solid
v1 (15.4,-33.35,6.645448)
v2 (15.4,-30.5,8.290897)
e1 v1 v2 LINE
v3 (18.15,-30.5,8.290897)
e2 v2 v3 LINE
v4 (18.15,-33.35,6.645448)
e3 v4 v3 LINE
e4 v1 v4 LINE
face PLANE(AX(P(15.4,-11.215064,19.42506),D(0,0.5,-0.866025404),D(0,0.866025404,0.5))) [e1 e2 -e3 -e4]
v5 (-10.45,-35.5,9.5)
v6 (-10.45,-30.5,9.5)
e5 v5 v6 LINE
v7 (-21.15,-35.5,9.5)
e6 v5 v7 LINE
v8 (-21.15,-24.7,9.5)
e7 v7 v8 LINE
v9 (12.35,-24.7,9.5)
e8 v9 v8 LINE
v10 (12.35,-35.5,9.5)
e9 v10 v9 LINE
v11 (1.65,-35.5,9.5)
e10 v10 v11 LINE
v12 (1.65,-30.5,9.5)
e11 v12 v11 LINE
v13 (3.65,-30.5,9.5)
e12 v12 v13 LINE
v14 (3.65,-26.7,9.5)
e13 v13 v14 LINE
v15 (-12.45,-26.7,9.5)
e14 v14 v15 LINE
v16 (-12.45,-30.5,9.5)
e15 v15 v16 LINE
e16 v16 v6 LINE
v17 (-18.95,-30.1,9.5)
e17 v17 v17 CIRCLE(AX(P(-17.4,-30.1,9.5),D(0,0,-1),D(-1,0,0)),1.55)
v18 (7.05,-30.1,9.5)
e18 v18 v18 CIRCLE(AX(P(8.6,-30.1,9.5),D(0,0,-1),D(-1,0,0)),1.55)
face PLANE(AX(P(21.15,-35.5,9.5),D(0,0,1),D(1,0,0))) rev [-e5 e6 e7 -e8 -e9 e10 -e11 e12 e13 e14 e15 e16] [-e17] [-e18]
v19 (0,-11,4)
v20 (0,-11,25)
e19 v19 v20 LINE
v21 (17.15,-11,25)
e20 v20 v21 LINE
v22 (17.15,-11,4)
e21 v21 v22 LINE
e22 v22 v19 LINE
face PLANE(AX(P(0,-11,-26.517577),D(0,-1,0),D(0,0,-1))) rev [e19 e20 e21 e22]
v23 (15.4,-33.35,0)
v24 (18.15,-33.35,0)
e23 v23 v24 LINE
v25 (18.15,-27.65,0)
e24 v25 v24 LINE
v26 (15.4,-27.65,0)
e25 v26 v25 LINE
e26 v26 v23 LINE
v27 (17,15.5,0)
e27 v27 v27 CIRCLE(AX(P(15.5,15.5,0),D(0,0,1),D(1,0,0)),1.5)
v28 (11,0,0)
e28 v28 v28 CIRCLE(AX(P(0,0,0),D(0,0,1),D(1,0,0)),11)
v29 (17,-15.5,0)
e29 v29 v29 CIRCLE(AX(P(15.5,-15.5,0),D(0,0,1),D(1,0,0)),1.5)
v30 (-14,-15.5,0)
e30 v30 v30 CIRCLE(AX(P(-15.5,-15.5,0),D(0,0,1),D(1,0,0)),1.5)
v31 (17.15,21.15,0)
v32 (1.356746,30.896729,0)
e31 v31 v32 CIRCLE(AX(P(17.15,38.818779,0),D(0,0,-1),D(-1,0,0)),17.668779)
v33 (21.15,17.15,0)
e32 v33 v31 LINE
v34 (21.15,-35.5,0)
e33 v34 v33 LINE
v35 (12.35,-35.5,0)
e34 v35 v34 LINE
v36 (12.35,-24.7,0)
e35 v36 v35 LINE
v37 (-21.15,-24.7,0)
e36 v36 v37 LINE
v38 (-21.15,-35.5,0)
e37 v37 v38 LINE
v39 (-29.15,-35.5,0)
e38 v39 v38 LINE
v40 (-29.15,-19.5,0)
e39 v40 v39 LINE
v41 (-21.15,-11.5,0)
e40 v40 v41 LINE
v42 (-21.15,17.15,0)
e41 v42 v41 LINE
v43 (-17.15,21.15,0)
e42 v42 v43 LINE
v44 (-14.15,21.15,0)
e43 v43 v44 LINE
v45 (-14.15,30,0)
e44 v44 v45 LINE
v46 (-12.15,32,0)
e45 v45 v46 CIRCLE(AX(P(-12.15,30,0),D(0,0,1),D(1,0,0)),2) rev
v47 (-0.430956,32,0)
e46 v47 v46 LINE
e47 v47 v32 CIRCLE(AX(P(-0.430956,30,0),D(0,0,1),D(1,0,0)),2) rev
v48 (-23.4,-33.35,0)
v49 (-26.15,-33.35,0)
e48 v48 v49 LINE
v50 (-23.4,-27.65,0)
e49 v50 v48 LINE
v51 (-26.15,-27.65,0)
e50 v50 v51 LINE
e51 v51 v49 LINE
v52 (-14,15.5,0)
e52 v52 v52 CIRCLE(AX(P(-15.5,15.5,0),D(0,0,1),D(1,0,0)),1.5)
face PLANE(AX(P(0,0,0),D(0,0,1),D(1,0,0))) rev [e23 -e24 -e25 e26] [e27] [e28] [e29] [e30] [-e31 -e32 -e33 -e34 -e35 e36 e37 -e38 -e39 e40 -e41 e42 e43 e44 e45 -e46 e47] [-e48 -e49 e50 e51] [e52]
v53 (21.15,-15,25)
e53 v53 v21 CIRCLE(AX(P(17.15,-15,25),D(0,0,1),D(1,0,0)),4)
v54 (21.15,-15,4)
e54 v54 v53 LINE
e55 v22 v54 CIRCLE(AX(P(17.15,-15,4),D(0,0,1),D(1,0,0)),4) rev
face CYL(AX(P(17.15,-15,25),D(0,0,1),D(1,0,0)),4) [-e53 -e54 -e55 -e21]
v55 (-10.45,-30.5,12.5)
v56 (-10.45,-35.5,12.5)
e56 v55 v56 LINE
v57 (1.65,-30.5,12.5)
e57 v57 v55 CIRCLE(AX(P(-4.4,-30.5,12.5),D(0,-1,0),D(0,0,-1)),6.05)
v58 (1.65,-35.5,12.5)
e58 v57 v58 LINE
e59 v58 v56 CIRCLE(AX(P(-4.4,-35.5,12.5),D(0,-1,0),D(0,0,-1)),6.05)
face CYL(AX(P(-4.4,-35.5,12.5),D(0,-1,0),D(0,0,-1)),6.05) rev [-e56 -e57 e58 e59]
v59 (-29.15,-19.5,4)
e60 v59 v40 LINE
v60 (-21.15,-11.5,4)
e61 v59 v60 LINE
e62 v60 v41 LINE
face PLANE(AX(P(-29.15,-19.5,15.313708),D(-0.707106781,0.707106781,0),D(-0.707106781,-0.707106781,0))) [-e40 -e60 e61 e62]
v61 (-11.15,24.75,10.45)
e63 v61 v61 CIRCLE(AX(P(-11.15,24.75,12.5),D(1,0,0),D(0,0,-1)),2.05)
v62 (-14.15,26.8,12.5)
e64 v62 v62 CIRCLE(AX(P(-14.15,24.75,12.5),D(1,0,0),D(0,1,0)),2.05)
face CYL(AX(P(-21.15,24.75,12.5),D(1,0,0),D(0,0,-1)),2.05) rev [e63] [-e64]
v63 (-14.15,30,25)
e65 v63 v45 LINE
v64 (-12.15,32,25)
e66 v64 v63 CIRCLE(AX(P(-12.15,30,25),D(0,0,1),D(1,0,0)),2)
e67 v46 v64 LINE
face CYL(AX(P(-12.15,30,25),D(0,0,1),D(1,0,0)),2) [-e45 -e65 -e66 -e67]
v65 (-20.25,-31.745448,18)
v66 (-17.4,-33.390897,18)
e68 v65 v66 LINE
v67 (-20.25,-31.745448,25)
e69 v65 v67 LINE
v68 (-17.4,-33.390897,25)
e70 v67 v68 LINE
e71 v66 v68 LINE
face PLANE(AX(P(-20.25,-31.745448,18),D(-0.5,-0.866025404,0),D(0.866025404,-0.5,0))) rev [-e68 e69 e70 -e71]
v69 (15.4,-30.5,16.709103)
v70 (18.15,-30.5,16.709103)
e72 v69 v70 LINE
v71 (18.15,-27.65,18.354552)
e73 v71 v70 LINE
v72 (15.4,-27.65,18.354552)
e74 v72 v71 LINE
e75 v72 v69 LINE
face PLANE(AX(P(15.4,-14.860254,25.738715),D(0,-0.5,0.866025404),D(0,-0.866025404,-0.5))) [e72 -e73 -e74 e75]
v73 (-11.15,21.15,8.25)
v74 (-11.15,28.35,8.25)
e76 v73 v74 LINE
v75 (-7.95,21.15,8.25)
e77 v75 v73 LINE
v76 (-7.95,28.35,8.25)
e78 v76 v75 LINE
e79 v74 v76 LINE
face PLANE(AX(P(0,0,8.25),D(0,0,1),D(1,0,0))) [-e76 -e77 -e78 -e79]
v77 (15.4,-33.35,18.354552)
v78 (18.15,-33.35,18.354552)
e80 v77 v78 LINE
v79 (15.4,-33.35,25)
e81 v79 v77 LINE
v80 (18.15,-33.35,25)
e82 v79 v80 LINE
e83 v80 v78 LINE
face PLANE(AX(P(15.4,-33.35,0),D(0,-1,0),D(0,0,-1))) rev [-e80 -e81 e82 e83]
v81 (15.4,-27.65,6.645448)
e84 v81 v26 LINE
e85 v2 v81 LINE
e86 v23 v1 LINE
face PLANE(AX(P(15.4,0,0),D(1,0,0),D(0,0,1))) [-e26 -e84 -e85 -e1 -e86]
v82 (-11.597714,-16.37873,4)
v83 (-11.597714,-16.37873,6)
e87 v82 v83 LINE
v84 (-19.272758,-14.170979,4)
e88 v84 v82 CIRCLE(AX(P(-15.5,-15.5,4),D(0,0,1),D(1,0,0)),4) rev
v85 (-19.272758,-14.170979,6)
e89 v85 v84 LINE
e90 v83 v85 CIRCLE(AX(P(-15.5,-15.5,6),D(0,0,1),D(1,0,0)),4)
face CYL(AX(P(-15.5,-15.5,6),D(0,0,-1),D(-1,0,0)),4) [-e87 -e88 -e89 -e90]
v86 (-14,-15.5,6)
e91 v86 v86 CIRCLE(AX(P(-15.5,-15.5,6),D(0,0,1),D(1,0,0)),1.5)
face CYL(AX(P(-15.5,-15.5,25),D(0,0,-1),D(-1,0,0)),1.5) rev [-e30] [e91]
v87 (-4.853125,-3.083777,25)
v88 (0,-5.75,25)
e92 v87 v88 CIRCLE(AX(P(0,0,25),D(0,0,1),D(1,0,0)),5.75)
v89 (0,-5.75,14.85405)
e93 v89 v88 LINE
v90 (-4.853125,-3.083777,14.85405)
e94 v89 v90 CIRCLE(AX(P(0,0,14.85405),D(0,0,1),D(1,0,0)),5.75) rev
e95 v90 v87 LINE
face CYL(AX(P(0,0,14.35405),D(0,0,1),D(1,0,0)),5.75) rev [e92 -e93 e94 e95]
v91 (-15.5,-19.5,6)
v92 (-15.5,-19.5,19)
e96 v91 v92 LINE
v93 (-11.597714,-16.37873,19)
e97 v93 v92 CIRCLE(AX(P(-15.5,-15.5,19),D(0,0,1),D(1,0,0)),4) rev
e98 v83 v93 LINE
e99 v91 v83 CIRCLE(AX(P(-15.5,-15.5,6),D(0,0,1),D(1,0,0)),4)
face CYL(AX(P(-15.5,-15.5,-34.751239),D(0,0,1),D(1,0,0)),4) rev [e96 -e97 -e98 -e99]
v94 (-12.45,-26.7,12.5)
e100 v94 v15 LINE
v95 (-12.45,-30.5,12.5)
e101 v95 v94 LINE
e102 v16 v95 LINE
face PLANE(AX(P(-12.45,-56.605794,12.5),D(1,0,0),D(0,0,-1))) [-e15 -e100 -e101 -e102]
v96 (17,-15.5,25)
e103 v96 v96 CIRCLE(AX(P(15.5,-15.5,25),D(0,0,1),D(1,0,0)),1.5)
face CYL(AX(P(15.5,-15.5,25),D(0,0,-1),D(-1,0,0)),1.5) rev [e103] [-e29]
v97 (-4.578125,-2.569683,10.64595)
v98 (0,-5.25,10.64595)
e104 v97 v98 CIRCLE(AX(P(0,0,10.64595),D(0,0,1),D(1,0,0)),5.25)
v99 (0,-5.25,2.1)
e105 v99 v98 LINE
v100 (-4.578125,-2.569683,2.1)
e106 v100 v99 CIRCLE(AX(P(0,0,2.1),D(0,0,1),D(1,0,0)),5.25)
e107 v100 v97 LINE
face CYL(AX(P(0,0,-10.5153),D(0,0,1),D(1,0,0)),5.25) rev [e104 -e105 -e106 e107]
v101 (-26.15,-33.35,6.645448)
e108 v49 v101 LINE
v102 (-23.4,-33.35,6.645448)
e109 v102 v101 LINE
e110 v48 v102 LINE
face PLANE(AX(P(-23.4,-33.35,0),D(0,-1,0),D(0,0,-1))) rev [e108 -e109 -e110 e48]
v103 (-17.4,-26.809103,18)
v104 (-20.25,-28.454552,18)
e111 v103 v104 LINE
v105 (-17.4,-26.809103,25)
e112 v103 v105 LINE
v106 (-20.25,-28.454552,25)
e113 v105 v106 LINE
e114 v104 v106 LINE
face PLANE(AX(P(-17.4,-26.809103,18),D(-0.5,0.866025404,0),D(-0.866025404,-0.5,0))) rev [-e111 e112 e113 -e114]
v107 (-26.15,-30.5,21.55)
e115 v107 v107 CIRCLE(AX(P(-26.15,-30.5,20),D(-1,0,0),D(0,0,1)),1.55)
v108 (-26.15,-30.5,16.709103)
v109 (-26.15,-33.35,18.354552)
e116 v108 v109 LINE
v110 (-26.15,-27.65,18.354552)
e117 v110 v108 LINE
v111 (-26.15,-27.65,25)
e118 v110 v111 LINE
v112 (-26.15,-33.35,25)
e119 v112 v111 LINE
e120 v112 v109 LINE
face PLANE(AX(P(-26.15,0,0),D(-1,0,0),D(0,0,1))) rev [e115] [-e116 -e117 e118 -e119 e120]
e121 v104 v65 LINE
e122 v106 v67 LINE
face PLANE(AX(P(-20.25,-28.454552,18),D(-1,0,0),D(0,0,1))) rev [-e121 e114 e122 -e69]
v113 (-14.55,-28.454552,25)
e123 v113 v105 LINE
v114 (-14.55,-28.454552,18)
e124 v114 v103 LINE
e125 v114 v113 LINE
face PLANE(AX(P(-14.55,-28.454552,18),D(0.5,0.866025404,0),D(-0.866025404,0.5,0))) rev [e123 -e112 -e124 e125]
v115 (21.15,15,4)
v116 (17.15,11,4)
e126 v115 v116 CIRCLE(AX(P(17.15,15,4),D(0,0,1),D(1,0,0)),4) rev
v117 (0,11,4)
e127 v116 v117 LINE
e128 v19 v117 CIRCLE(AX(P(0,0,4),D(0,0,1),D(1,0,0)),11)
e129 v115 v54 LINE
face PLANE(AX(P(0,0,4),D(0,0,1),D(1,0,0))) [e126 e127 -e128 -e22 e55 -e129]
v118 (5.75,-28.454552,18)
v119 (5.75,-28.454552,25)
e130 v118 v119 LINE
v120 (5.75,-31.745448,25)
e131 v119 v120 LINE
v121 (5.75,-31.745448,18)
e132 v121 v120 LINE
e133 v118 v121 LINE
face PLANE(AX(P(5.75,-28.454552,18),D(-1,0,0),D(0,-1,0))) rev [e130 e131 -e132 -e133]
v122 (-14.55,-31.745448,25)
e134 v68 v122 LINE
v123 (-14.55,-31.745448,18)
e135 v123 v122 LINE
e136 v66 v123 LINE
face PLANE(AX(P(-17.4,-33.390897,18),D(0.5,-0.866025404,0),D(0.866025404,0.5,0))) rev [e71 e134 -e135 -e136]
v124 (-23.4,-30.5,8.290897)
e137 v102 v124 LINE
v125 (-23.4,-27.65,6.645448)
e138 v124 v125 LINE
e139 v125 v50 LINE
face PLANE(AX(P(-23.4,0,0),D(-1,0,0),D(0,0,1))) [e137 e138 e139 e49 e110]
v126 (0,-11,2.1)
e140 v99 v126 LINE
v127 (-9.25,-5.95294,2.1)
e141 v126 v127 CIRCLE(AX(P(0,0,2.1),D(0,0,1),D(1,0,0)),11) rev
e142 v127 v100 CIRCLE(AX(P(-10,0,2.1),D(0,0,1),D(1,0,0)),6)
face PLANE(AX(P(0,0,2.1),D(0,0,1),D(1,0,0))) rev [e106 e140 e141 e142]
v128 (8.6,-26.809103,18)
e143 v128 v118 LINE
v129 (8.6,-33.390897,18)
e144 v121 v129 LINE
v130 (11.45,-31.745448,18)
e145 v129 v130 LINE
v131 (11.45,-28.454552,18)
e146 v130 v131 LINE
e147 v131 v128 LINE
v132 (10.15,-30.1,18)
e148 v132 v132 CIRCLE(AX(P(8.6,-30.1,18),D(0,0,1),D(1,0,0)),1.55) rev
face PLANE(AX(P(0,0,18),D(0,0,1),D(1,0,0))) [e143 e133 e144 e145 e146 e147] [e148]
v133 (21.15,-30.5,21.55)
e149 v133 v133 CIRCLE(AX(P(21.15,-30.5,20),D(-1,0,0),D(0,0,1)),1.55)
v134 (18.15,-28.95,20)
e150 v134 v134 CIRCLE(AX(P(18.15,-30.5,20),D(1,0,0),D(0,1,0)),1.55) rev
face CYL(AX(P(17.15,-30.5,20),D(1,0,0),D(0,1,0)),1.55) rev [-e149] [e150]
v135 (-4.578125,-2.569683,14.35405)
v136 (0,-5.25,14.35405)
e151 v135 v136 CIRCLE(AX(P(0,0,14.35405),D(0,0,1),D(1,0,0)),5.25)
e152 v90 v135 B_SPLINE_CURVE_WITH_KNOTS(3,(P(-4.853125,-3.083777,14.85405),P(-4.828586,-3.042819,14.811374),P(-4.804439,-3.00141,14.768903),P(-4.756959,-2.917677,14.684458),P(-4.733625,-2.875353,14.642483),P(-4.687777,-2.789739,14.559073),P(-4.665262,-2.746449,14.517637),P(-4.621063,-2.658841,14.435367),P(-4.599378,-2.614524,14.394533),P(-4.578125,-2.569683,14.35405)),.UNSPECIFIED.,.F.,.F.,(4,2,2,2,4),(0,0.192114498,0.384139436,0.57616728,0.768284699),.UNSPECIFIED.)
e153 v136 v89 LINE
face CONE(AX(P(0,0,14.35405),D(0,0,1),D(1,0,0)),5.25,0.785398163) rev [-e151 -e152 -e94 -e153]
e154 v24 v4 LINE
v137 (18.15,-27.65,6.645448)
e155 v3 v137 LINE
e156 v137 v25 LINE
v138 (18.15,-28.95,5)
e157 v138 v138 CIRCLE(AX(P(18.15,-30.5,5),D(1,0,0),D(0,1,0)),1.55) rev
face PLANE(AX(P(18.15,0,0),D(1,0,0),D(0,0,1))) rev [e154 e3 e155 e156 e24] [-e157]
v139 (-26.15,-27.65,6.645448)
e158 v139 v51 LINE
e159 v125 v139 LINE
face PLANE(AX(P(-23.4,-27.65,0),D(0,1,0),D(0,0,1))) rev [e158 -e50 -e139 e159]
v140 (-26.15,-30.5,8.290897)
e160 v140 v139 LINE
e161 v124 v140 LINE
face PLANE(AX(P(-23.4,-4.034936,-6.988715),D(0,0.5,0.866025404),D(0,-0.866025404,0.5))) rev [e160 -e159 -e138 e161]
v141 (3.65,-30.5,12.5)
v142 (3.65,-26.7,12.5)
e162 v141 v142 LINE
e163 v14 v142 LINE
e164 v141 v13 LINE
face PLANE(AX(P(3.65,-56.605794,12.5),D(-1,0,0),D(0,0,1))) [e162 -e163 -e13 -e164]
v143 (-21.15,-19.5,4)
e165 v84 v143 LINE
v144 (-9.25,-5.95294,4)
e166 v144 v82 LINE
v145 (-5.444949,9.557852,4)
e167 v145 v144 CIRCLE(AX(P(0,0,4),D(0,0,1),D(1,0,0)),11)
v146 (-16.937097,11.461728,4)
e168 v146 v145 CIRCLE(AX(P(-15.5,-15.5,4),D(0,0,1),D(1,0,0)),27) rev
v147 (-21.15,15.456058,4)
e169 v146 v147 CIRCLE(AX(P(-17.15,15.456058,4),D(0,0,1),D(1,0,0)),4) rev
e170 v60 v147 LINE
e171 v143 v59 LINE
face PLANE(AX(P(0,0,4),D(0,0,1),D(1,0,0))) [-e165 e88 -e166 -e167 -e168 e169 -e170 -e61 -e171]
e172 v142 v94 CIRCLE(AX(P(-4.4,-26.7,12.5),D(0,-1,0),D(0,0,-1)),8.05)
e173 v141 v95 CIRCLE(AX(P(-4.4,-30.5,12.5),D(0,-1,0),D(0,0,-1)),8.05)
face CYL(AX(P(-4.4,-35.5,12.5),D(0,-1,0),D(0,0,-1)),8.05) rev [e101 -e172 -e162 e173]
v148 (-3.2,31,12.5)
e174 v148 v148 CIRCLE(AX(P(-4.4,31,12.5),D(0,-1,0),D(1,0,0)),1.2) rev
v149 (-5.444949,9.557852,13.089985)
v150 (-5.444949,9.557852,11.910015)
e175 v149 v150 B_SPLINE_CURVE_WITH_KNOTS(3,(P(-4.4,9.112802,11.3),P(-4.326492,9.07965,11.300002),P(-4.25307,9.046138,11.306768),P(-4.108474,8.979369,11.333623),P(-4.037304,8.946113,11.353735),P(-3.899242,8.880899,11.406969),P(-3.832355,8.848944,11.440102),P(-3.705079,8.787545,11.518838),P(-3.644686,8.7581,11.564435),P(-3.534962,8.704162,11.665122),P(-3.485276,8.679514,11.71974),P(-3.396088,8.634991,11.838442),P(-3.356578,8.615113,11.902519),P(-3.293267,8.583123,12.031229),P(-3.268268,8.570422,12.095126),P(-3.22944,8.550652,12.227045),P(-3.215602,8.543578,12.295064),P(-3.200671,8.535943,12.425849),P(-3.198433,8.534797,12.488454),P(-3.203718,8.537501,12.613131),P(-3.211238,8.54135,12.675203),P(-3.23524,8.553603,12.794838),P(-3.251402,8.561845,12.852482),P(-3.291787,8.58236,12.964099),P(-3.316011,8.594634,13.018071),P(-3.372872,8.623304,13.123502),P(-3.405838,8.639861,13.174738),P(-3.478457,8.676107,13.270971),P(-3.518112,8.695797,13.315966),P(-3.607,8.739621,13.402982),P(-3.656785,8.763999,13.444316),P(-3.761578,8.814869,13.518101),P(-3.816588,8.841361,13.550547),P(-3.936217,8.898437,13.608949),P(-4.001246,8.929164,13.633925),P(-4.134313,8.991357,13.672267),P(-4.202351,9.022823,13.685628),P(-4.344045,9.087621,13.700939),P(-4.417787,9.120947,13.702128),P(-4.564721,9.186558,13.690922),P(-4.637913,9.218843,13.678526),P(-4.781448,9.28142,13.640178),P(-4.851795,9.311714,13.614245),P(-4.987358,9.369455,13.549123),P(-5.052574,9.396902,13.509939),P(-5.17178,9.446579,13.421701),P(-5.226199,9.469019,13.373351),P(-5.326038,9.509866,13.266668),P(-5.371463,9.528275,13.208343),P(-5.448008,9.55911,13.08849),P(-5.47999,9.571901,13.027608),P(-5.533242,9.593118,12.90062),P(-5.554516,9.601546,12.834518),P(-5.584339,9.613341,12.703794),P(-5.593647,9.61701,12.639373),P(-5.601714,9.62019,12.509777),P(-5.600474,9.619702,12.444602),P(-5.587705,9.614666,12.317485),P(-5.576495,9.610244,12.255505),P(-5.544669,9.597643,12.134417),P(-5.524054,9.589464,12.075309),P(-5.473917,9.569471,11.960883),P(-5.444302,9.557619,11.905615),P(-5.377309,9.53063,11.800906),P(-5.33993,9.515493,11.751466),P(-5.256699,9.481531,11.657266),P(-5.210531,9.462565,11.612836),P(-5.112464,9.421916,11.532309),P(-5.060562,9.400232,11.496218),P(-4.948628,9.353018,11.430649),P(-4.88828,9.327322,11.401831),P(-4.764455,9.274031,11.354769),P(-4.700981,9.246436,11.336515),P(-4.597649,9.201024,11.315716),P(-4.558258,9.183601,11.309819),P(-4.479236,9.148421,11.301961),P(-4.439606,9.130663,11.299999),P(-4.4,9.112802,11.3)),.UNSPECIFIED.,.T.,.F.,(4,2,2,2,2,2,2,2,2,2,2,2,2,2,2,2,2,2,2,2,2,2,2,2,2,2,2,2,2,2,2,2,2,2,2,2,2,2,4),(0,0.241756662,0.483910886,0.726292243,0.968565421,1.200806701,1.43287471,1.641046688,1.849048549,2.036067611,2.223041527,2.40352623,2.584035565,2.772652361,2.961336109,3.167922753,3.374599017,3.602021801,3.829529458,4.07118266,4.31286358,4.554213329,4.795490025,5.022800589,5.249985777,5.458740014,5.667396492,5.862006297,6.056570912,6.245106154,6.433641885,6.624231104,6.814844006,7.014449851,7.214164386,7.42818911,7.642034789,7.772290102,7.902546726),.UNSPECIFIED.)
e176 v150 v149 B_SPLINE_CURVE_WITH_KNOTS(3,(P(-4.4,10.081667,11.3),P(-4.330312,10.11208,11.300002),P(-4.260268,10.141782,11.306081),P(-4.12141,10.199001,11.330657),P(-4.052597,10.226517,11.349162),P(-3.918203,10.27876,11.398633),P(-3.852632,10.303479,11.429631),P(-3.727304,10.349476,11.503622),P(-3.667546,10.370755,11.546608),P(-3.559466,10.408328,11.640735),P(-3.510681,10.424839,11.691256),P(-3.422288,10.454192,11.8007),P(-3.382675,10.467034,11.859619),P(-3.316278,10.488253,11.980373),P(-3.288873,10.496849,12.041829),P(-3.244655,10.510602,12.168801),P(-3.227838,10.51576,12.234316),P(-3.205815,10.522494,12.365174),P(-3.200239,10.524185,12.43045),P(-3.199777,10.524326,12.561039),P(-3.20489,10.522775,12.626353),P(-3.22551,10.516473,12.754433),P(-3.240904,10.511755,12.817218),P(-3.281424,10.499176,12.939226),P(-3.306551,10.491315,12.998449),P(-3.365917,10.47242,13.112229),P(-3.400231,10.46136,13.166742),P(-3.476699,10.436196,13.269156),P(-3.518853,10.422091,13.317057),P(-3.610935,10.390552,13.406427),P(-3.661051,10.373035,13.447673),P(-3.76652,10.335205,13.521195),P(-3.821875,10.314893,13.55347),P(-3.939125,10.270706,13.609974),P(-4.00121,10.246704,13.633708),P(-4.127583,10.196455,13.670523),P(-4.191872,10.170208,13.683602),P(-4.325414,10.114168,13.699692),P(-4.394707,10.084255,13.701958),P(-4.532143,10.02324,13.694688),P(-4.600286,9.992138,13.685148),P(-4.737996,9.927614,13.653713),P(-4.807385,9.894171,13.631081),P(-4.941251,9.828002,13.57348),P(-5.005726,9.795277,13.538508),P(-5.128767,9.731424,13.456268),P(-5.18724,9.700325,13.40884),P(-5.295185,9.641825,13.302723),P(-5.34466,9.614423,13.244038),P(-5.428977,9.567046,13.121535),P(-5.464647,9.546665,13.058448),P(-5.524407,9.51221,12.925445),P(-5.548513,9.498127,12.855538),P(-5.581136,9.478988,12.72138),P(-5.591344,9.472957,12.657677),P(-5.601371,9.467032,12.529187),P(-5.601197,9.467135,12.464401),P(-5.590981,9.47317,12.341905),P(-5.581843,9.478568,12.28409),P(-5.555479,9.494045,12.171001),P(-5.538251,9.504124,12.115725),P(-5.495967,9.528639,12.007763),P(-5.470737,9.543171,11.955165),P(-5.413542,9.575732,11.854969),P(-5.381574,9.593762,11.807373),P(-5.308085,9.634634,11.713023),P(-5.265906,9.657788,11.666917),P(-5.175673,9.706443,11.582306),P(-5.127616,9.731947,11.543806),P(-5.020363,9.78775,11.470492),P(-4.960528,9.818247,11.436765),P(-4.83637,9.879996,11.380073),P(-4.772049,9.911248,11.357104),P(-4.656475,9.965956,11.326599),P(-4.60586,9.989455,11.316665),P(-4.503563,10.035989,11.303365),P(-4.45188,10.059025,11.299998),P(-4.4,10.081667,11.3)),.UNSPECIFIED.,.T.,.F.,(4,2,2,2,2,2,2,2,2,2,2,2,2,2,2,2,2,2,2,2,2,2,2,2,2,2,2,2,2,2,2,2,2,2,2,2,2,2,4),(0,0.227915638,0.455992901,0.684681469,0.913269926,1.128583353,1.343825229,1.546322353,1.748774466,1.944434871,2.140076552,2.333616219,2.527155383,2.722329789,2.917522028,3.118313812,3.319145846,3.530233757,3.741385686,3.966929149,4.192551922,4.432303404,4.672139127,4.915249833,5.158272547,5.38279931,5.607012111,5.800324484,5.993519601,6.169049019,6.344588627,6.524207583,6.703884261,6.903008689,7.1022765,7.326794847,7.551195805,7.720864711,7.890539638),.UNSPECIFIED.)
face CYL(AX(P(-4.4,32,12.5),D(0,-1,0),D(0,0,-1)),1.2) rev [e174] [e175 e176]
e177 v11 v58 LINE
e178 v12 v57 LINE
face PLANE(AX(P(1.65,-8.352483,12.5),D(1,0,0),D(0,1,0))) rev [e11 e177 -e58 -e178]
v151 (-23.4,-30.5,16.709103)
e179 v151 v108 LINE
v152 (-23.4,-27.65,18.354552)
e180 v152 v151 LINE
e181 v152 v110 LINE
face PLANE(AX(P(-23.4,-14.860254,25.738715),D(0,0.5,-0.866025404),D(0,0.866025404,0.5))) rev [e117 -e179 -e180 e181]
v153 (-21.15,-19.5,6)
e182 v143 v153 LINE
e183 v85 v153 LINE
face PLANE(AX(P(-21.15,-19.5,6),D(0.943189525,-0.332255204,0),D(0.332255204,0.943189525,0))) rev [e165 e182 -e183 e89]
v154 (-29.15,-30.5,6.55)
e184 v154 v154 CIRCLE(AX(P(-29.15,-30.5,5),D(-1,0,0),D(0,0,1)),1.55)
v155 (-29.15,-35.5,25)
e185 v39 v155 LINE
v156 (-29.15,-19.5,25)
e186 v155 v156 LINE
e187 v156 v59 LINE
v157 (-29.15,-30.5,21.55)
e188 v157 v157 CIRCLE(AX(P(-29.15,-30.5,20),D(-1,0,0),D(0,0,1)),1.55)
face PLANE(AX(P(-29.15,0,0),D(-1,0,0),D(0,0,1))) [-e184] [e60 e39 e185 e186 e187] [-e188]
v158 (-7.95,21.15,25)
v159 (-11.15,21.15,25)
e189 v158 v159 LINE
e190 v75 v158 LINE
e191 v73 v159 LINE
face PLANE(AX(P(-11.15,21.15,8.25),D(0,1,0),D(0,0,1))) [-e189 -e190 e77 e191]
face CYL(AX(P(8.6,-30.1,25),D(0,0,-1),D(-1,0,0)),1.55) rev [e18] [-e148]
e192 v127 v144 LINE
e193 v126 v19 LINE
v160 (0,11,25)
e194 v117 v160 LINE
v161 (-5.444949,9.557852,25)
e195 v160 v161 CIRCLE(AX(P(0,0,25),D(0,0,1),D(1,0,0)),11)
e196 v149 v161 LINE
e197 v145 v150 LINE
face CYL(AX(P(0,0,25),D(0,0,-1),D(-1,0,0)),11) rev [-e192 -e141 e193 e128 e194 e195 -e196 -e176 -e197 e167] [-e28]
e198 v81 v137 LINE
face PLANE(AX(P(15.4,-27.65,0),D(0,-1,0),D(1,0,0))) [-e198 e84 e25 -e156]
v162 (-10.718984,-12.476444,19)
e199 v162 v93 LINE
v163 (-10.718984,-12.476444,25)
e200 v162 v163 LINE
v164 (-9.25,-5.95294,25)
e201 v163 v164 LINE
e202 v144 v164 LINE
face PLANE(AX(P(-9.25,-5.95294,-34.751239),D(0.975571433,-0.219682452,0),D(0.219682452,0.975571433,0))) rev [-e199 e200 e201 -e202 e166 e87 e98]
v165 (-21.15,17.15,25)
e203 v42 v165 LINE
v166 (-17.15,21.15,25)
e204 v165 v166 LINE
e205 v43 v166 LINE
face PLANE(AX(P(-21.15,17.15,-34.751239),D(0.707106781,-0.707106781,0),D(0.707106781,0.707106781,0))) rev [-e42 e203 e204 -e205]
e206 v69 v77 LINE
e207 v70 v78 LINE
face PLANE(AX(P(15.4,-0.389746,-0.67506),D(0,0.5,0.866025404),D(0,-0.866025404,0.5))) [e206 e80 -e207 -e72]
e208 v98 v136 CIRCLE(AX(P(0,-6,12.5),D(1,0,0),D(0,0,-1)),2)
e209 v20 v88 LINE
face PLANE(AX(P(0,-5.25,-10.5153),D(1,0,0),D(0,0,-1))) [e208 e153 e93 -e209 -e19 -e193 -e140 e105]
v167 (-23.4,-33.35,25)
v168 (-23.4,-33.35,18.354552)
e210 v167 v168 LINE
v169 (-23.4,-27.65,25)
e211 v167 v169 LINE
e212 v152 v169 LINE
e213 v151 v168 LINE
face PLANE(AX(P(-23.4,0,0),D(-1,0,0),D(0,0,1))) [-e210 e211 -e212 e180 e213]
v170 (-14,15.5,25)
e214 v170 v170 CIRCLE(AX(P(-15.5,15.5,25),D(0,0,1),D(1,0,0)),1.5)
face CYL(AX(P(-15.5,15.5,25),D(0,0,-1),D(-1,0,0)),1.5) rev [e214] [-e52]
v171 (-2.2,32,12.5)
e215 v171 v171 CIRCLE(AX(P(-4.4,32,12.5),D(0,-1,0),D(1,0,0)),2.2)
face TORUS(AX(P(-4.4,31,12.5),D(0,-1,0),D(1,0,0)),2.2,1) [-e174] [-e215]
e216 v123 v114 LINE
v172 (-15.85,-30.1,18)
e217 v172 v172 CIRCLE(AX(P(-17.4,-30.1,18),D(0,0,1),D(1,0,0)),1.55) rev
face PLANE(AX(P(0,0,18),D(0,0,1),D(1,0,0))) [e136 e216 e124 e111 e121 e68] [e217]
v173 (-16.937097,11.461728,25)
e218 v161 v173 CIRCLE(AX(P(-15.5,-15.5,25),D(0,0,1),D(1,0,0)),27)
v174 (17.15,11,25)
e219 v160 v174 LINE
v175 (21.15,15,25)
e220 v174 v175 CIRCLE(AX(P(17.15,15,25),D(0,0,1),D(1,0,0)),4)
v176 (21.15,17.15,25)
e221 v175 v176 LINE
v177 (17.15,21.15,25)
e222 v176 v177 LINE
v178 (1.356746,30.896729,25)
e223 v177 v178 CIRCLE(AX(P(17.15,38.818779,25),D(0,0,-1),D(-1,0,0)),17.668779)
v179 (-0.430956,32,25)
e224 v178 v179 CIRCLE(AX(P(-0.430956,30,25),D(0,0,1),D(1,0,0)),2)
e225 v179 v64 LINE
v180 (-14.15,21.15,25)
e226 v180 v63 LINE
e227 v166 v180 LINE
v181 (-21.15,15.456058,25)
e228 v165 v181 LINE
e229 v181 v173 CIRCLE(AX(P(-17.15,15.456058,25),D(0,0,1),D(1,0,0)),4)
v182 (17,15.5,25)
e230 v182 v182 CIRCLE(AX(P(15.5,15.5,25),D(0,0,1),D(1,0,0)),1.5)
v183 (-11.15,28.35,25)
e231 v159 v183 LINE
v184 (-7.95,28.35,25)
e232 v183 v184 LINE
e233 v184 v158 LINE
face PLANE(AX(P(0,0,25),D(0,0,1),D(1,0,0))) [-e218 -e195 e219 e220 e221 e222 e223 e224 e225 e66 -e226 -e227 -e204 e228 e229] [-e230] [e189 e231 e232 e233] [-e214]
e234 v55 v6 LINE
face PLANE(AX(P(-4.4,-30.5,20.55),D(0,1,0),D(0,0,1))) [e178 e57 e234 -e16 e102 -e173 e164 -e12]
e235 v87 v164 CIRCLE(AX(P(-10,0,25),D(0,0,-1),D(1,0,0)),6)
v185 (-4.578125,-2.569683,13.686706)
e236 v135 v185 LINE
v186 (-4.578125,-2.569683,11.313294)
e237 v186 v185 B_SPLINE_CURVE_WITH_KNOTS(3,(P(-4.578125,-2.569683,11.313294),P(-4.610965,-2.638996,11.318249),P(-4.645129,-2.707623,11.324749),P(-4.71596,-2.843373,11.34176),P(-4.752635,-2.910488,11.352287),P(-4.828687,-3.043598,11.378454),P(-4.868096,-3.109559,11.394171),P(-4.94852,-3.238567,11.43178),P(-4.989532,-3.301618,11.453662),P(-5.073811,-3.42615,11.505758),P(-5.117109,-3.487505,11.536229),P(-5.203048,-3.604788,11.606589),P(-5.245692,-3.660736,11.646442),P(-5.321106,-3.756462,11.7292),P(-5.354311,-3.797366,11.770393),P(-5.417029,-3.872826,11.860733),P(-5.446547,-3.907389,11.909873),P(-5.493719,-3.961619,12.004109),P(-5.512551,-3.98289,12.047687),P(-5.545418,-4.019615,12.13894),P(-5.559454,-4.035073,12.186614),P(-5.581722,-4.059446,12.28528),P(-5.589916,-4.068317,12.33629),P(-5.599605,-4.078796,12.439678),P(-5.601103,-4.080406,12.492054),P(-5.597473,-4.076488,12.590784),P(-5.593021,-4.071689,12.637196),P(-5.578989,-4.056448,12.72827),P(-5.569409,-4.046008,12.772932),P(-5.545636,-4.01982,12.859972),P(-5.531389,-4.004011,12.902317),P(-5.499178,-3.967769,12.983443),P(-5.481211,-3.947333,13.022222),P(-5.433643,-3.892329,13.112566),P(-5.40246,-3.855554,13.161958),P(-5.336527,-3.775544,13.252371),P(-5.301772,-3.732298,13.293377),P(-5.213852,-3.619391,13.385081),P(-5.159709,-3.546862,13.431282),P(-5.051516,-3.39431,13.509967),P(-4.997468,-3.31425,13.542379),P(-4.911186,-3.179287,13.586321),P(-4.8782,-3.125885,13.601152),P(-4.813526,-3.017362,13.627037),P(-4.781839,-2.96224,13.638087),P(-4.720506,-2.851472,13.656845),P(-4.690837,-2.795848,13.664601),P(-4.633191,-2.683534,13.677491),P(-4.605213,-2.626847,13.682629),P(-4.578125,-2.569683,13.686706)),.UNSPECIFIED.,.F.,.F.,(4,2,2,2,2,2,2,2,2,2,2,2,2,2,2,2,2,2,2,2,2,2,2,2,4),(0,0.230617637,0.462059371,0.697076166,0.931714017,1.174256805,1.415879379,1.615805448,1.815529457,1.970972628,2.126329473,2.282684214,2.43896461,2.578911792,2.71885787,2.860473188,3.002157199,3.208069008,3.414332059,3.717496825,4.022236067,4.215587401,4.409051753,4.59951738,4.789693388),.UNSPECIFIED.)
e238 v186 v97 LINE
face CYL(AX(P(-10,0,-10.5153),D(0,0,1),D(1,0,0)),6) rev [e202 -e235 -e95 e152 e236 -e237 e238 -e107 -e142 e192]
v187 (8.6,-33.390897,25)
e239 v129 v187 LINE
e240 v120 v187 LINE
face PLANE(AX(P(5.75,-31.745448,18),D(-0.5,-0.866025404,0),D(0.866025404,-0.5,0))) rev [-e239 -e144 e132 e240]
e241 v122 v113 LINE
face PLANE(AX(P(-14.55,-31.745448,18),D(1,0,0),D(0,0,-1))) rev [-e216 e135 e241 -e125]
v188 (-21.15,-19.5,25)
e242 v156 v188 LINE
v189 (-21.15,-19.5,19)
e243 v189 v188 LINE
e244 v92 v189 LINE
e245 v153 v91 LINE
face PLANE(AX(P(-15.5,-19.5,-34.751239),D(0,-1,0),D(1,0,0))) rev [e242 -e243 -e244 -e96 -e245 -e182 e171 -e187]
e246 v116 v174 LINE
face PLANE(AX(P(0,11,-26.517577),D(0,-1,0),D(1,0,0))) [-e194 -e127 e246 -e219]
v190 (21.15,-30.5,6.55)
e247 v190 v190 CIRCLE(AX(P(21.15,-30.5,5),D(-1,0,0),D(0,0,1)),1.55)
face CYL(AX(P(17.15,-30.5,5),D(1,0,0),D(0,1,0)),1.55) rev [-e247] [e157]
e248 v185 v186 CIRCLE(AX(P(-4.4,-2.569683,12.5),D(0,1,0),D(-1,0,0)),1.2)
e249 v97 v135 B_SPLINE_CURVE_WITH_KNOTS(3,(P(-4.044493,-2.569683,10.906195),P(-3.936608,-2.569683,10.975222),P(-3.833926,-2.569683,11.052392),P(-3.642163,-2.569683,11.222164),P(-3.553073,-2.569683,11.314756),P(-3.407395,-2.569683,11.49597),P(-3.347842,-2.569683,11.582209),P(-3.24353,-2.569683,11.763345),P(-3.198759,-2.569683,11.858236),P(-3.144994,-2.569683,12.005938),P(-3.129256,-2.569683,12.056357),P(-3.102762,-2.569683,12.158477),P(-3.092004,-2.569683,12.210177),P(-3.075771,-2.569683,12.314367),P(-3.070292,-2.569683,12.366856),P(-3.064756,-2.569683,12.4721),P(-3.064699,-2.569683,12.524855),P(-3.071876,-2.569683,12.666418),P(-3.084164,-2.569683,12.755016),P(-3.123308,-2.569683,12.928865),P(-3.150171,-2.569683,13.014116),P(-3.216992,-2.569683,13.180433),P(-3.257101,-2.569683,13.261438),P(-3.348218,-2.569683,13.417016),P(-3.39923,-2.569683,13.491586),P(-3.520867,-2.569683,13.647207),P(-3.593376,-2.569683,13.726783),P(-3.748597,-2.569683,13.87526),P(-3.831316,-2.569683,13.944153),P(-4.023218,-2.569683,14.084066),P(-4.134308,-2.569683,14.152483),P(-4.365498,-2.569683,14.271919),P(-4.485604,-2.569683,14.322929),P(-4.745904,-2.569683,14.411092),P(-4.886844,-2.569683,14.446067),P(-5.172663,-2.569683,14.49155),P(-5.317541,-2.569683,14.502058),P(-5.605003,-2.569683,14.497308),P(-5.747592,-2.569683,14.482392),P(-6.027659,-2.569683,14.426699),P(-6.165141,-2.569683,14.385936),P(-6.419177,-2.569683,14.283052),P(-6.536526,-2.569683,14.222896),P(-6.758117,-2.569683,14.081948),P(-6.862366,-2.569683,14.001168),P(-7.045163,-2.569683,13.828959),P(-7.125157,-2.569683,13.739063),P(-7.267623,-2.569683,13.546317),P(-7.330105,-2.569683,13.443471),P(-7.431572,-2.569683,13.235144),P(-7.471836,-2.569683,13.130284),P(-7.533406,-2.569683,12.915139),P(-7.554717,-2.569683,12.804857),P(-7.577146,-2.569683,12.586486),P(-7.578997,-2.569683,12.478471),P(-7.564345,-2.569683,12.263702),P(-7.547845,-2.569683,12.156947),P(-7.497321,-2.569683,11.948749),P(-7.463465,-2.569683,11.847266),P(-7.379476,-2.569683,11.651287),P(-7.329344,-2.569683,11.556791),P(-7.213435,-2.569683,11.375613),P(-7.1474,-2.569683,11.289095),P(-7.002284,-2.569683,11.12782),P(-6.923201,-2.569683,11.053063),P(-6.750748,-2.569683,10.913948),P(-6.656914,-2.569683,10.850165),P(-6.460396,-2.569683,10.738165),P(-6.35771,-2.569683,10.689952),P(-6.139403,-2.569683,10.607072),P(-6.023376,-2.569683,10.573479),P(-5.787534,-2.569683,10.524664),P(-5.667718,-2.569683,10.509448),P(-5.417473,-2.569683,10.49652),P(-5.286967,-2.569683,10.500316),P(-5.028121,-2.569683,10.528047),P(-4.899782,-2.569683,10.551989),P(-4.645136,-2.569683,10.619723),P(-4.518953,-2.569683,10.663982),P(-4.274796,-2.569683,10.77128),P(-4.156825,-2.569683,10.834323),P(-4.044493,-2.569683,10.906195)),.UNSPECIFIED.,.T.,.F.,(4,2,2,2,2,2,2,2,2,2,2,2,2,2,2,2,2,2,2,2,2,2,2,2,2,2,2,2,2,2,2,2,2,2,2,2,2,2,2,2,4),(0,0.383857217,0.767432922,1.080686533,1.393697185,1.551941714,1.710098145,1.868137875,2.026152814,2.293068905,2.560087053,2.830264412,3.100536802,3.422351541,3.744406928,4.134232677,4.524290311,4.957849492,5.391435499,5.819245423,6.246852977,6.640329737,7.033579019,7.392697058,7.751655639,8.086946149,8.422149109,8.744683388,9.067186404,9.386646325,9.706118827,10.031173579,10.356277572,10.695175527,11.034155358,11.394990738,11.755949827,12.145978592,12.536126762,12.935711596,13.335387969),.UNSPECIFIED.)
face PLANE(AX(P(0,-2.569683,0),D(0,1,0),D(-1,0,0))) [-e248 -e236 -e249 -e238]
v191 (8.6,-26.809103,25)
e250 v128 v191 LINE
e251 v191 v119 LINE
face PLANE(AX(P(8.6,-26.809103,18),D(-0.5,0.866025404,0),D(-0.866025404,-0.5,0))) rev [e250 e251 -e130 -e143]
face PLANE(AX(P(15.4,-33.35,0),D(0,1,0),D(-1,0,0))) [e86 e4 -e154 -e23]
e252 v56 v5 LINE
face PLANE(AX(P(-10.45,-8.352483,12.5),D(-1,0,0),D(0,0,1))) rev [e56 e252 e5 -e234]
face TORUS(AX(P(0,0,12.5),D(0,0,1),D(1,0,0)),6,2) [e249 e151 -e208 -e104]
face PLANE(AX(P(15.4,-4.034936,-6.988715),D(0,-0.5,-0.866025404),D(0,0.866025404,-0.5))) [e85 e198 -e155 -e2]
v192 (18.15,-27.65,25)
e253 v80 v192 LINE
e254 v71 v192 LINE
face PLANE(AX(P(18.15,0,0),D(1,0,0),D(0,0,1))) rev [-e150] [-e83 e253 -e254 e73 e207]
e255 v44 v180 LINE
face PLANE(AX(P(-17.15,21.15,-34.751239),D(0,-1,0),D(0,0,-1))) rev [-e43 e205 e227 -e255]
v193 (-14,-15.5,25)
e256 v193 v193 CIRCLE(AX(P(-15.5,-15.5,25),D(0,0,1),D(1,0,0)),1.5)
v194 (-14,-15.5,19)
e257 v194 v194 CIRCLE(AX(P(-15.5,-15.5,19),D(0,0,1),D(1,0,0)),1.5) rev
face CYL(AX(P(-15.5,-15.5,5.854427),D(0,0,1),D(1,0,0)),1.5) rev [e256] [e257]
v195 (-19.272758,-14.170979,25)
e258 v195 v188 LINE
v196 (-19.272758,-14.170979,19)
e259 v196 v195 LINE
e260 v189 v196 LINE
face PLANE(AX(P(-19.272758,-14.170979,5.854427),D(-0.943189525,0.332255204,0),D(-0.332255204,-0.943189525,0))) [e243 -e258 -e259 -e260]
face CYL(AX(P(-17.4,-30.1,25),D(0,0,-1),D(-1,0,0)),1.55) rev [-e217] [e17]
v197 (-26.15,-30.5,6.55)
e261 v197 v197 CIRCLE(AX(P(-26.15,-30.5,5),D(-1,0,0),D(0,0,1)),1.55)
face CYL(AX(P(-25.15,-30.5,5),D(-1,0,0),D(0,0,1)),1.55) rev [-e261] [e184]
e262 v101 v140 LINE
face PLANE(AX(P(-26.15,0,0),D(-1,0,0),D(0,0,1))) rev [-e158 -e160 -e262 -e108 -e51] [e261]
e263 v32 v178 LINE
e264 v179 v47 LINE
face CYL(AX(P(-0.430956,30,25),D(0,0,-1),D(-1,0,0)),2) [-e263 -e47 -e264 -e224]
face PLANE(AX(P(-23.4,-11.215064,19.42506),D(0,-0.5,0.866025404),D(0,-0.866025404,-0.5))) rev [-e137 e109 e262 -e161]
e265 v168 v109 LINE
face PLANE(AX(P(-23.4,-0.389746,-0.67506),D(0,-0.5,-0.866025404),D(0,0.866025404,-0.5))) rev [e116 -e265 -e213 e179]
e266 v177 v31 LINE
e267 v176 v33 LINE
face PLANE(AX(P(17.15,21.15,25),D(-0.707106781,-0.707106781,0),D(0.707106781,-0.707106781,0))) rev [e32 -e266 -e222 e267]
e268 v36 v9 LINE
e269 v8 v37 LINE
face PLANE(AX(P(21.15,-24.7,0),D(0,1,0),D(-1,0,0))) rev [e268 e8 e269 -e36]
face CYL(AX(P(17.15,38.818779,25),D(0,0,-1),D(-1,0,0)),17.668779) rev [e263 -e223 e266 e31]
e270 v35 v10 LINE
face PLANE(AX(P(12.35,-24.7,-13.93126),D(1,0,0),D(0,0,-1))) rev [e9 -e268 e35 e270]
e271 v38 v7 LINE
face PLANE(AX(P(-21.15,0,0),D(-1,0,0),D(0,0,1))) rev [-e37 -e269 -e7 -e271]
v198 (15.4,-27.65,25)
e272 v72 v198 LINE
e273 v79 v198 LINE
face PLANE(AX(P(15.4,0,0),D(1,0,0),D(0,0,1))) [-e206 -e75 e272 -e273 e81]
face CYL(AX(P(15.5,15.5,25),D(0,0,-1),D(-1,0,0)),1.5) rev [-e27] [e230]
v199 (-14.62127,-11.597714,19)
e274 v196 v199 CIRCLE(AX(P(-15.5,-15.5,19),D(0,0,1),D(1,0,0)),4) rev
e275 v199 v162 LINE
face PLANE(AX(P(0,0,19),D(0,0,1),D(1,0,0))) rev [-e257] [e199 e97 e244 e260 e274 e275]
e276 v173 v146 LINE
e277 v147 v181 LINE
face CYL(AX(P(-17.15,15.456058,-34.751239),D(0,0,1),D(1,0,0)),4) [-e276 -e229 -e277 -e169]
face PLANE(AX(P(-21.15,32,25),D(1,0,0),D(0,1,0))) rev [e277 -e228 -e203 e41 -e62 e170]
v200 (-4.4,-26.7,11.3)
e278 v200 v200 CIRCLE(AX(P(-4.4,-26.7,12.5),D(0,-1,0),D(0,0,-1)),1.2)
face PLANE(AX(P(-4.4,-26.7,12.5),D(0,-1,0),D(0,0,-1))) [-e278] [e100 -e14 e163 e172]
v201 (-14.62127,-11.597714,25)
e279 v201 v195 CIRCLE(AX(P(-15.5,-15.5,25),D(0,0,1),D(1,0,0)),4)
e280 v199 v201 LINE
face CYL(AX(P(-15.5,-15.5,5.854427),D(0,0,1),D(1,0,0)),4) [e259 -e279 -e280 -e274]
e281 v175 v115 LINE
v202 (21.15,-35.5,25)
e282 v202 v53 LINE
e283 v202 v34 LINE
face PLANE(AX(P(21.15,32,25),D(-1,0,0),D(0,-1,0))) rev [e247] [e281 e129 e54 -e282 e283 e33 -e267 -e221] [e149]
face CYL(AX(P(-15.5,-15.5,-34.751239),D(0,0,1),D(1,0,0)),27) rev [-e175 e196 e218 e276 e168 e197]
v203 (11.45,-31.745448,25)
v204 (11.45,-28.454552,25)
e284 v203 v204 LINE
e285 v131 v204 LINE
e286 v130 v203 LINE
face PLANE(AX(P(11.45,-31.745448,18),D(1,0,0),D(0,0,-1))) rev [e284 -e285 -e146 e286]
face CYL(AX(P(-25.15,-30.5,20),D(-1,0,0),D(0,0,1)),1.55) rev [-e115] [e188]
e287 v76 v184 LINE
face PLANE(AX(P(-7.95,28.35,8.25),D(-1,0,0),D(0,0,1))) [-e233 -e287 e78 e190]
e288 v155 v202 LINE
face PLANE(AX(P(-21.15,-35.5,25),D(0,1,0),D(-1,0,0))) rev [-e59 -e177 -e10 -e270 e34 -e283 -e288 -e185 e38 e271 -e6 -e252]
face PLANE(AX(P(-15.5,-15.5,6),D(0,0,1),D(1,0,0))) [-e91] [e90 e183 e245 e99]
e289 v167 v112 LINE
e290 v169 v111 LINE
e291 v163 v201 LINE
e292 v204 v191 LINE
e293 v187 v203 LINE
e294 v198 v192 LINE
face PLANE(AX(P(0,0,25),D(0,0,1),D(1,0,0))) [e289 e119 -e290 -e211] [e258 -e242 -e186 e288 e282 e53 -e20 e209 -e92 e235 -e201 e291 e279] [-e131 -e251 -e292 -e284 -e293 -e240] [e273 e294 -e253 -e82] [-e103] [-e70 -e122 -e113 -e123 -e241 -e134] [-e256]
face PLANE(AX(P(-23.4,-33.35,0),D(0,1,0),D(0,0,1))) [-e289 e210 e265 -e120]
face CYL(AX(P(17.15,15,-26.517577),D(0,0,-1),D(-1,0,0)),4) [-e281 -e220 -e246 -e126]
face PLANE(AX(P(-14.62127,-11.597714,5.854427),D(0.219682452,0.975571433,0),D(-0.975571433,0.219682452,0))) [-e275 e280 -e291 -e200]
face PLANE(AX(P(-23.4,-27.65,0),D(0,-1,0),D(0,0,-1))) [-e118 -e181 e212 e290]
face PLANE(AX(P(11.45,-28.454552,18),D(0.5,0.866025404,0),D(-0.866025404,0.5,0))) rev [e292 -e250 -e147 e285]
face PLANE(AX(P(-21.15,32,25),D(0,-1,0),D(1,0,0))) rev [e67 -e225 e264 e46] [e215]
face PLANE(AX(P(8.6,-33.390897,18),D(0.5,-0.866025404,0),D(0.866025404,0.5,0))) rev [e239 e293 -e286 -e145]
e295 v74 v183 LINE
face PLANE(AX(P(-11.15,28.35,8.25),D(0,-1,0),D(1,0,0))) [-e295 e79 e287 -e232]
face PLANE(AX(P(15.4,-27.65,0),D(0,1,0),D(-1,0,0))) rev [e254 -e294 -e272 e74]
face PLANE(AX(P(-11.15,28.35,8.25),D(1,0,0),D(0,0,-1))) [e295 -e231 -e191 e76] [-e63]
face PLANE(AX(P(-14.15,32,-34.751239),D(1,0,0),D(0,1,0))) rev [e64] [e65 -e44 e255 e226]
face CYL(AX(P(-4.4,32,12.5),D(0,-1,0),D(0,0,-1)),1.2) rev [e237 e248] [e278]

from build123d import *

# Parameters (mm, degrees)
SKETCH2_W                = 42.3
SKETCH2_H                = 67.5
SKETCH2_R                = 11
SKETCH2_R_2              = 1.5
BOSS_EXTRUDE1_DEPTH      = 25
CUT_EXTRUDE1_START       = 3.8
CUT_EXTRUDE1_DEPTH       = 3.8
CUT_EXTRUDE2_DEPTH       = 5
SKETCH6_W                = 9.5
SKETCH6_H                = 10.8
CUT_EXTRUDE3_DEPTH       = 61.61798413
SKETCH7_R                = 1.55
CUT_EXTRUDE4_DEPTH       = 45.134142112
BOSS_EXTRUDE2_START      = -22.9
BOSS_EXTRUDE2_DEPTH      = 22.9
REVOLVE1_ANGLE           = 60.694678
SKETCH8_R                = 1.2
FILAMENT_HOLE_DEPTH      = 68.216162491
SKETCH11_R               = 3
SKETCH11_R_2             = 1.2
CUT_EXTRUDE6_DEPTH       = 5
CUT_EXTRUDE7_START       = -10.64595
CUT_EXTRUDE7_DEPTH       = 10.64595
CHAMFER1_SIZE            = 0.5
CUT_EXTRUDE8_START       = -21
CUT_EXTRUDE8_DEPTH       = 21
CUT_EXTRUDE9_DEPTH       = 47.352696884
SKETCH16_R               = 1.5
BOSS_EXTRUDE4_DEPTH      = 2
CUT_EXTRUDE10_DEPTH      = 4.25
CUT_EXTRUDE10_DEPTH_BACK = 44.172010687
SKETCH17_W               = 3.2
SKETCH17_H               = 7.2
SKETCH18_R               = 2.05
CUT_EXTRUDE11_DEPTH      = 55.115986594
FILLET1_R                = 4
BOSS_EXTRUDE5_START      = -6
SKETCH19_R               = 1.5
BOSS_EXTRUDE5_DEPTH      = 6
CUT_EXTRUDE12_DEPTH      = 49.29671319
FILLET2_R                = 2
CUT_EXTRUDE13_START      = -21
CUT_EXTRUDE13_DEPTH      = 21
FILLET3_R                = 4
SKETCH23_W               = 25
SKETCH23_H               = 16
BOSS_EXTRUDE6_DEPTH      = 8
BOSS_EXTRUDE7_DEPTH      = 4
CUT_EXTRUDE14_DEPTH      = 7
CUT_EXTRUDE15_START      = -3
SKETCH27_R               = 1.55
CUT_EXTRUDE15_DEPTH      = 2.75
SKETCH27_3_R             = 1.55
CUT_EXTRUDE18_DEPTH      = 4
SKETCH29_W               = 8.8
SKETCH29_H               = 10.8
BOSS_EXTRUDE9_DEPTH      = 9.5
FILLET4_R                = 1


# Read off the part's stored shape, not the designer's step: Revolve1
with BuildPart() as part:
    # Sketch2 → Boss-Extrude1 (new body)
    with BuildSketch(Plane.XY):
        with Locations((0, -1.75)):
            Rectangle(SKETCH2_W, SKETCH2_H)
        Circle(SKETCH2_R, mode=Mode.SUBTRACT)
        with Locations((-15.5, 15.5)):
            Circle(SKETCH2_R_2, mode=Mode.SUBTRACT)
        with Locations((15.5, 15.5)):
            Circle(SKETCH2_R_2, mode=Mode.SUBTRACT)
        with Locations((15.5, -15.5)):
            Circle(SKETCH2_R_2, mode=Mode.SUBTRACT)
        with Locations((-15.5, -15.5)):
            Circle(SKETCH2_R_2, mode=Mode.SUBTRACT)
    extrude(amount=BOSS_EXTRUDE1_DEPTH)

    # Sketch3 → Cut-Revolve1 (revolve, cut)
    with BuildSketch(Plane(origin=(-4.4, 0, 0), x_dir=(0, 0, -1), z_dir=(1, 0, 0)), mode=Mode.PRIVATE) as cut_revolve1_sk:
        Polygon((-12.5, -26.7), (-20.55, -26.7), (-20.55, -30.5), (-18.55, -30.5), (-18.55, -35.5), (-12.5, -35.5), align=None)
    revolve(cut_revolve1_sk.sketch.rotate(Axis((-4.4, -35.5, 12.5), (0, 1, 0)), 180), axis=Axis((-4.4, -35.5, 12.5), (0, 1, 0)), mode=Mode.SUBTRACT)

    # Sketch4 → Cut-Extrude1 (cut)
    with BuildSketch(Plane.XZ.offset(26.7).offset(CUT_EXTRUDE1_START)):
        with BuildLine():
            Line((3.65, 0), (-12.45, 0))
            Line((-12.45, 0), (-12.45, 12.5))
            ThreePointArc((-12.45, 12.5), (-4.4, 20.55), (3.65, 12.5))
            Line((3.65, 12.5), (3.65, 0))
        make_face()
    extrude(amount=-CUT_EXTRUDE1_DEPTH, mode=Mode.SUBTRACT)

    # Sketch5 → Cut-Extrude2 (cut)
    with BuildSketch(Plane.XZ.offset(35.5)):
        with BuildLine():
            Line((-10.45, 0), (1.65, 0))
            Line((1.65, 0), (1.65, 12.5))
            ThreePointArc((1.65, 12.5), (-4.4, 18.55), (-10.45, 12.5))
            Line((-10.45, 12.5), (-10.45, 0))
        make_face()
    extrude(amount=-CUT_EXTRUDE2_DEPTH, mode=Mode.SUBTRACT)

    # Sketch6 → Cut-Extrude3 (cut, through all)
    with BuildSketch(Plane.ZY.offset(21.15)):
        with Locations((4.75, -30.1)):
            Rectangle(SKETCH6_W, SKETCH6_H)
    extrude(amount=-CUT_EXTRUDE3_DEPTH, mode=Mode.SUBTRACT)

    # Sketch7 → Cut-Extrude4 (cut, through all)
    with BuildSketch(Plane(origin=(0, 0, 9.5), x_dir=(-1, 0, 0), z_dir=(0, 0, -1))):
        with Locations((-8.6, -30.1)):
            Circle(SKETCH7_R)
        with Locations((17.4, -30.1)):
            Circle(SKETCH7_R)
    extrude(amount=-CUT_EXTRUDE4_DEPTH, mode=Mode.SUBTRACT)

    # Sketch9 → Boss-Extrude2 (add)
    with BuildSketch(Plane.XY.offset(25).offset(BOSS_EXTRUDE2_START)):
        with BuildLine():
            Line((0, -5.25), (0, -11))
            ThreePointArc((0, -11), (-5.268664681, -9.656146875), (-9.25, -5.95294045))
            ThreePointArc((-9.25, -5.95294045), (-6.480821439, -4.859566056), (-4.578125, -2.569683149))
            ThreePointArc((-4.578125, -2.569683149), (-2.652514229, -4.530636629), (0, -5.25))
        make_face()
    extrude(amount=BOSS_EXTRUDE2_DEPTH)

    # Revolve1 outline → Revolve1 (revolve)
    with BuildSketch(Plane(origin=(0, 0, 0), x_dir=(-0.8720238095238088, -0.4894634568827219, 0), z_dir=(-0.4894634568827219, 0.8720238095238088, 0))):
        with BuildLine():
            Line((5.25, 10.645950378), (5.25, 14.354049622))
            ThreePointArc((5.25, 14.354049622), (4, 12.5), (5.25, 10.645950378))
        make_face()
    revolve(axis=Axis((0, 0, 0), (0, 0, 1)), revolution_arc=REVOLVE1_ANGLE)

    # Sketch8 → filament hole (cut, through all)
    with BuildSketch(Plane.XZ.offset(26.7)):
        with Locations(Location((-4.4, 12.5, 0), (0, 0, 270))):
            Circle(SKETCH8_R)
    extrude(amount=-FILAMENT_HOLE_DEPTH, mode=Mode.SUBTRACT)

    # Sketch11 → Cut-Extrude6 (cut)
    with BuildSketch(Plane(origin=(0, -2.569683149, 0), x_dir=(1, 0, 0), z_dir=(0, 1, 0))):
        with Locations((-4.4, -12.5)):
            Circle(SKETCH11_R)
        with Locations(Location((-4.4, -12.5, 0), (0, 0, 90))):
            Circle(SKETCH11_R_2, mode=Mode.SUBTRACT)
    extrude(amount=CUT_EXTRUDE6_DEPTH, mode=Mode.SUBTRACT)

    # Sketch12 → Cut-Extrude7 (cut)
    with BuildSketch(Plane.XY.offset(25).offset(CUT_EXTRUDE7_START)):
        with BuildLine():
            Line((0, -5.75), (0, -5.25))
            ThreePointArc((0, -5.25), (-2.652514229, -4.530636629), (-4.578125, -2.569683149))
            ThreePointArc((-4.578125, -2.569683149), (-4.709376961, -2.830072058), (-4.853125, -3.083776538))
            ThreePointArc((-4.853125, -3.083776538), (-2.768644516, -5.0395543), (0, -5.75))
        make_face()
    extrude(amount=CUT_EXTRUDE7_DEPTH, mode=Mode.SUBTRACT)

    # Chamfer1
    chamfer1_edges = [part.edges().sort_by_distance(p)[0] for p in [
        (-2.768644516, -5.0395543, 14.35405),
    ]]
    chamfer(chamfer1_edges, length=CHAMFER1_SIZE - 0.0001)  # a hair under: the kernel refuses the full size

    # Sketch14 → Cut-Extrude8 (cut)
    with BuildSketch(Plane.XY.offset(25).offset(CUT_EXTRUDE8_START)):
        with BuildLine():
            Line((-15.5, -19.5), (-21.15, -19.5))
            Line((-21.15, -19.5), (-21.15, 10.902225285))
            ThreePointArc((-21.15, 10.902225285), (-13.197185602, 11.401617904), (-5.444948707, 9.557851933))
            ThreePointArc((-5.444948707, 9.557851933), (-10.683236844, 2.620772889), (-9.25, -5.95294045))
            Line((-9.25, -5.95294045), (-11.597714269, -16.378729809))
            ThreePointArc((-11.597714269, -16.378729809), (-13.001492369, -18.623693266), (-15.5, -19.5))
        make_face()
        Polygon((-21.15, 32), (-21.15, 17.15), (-17.15, 21.15), (-14.15, 21.15), (-14.15, 32), align=None)
    extrude(amount=CUT_EXTRUDE8_DEPTH, mode=Mode.SUBTRACT)

    # Sketch15 → Cut-Extrude9 (cut, through all)
    with BuildSketch(Plane.XY.offset(4)):
        Polygon((-14.15, 32), (-21.15, 32), (-21.15, 17.15), (-17.15, 21.15), (-14.15, 21.15), align=None)
    extrude(amount=-CUT_EXTRUDE9_DEPTH, mode=Mode.SUBTRACT)

    # Sketch16 → Boss-Extrude4 (add)
    with BuildSketch(Plane.XY.offset(4)):
        with BuildLine():
            Line((-21.15, -19.5), (-19.272758099, -14.170979185))
            ThreePointArc((-19.272758099, -14.170979185), (-12.235334377, -13.188732302), (-15.5, -19.5))
            Line((-15.5, -19.5), (-21.15, -19.5))
        make_face()
        with Locations((-15.5, -15.5)):
            Circle(SKETCH16_R, mode=Mode.SUBTRACT)
    extrude(amount=BOSS_EXTRUDE4_DEPTH)

    # Sketch17 → Cut-Extrude10 (cut, two sides: drawn at the far end of the back side and taken through both)
    with BuildSketch(Plane(origin=(0, 0, 12.5), x_dir=(-1, 0, 0), z_dir=(0, 0, -1)).offset(-CUT_EXTRUDE10_DEPTH_BACK)):
        with Locations((9.55, 24.75)):
            Rectangle(SKETCH17_W, SKETCH17_H)
    extrude(amount=CUT_EXTRUDE10_DEPTH + CUT_EXTRUDE10_DEPTH_BACK, mode=Mode.SUBTRACT)

    # Sketch18 → Cut-Extrude11 (cut, through all)
    with BuildSketch(Plane(origin=(-11.15, 0, 0), x_dir=(0, 0, -1), z_dir=(1, 0, 0))):
        with Locations((-12.5, 24.75)):
            Circle(SKETCH18_R)
    extrude(amount=-CUT_EXTRUDE11_DEPTH, mode=Mode.SUBTRACT)

    # Fillet1
    fillet1_edges = [part.edges().sort_by_distance(p)[0] for p in [
        (-21.15, 10.902225285, 14.5),
    ]]
    fillet(fillet1_edges, radius=FILLET1_R)

    # Sketch19 → Boss-Extrude5 (add)
    with BuildSketch(Plane.XY.offset(25).offset(BOSS_EXTRUDE5_START)):
        with BuildLine():
            Line((-14.621270191, -11.597714269), (-10.71898446, -12.476444079))
            Line((-10.71898446, -12.476444079), (-11.597714269, -16.378729809))
            ThreePointArc((-11.597714269, -16.378729809), (-13.001492369, -18.623693266), (-15.5, -19.5))
            Line((-15.5, -19.5), (-21.15, -19.5))
            Line((-21.15, -19.5), (-19.272758099, -14.170979185))
            ThreePointArc((-19.272758099, -14.170979185), (-17.436303958, -11.999896147), (-14.621270191, -11.597714269))
        make_face()
        with Locations((-15.5, -15.5)):
            Circle(SKETCH19_R, mode=Mode.SUBTRACT)
    extrude(amount=BOSS_EXTRUDE5_DEPTH)

    # Sketch21 → Cut-Extrude12 (cut, through all)
    with BuildSketch(Plane(origin=(0, 0, 0), x_dir=(-1, 0, 0), z_dir=(0, 0, -1))):
        with BuildLine():
            Line((-17.15, 21.15), (-21.15, 17.15))
            Line((-21.15, 17.15), (-21.15, 32))
            Line((-21.15, 32), (-0.85, 32))
            ThreePointArc((-0.85, 32), (-7.359539081, 24.110528758), (-17.15, 21.15))
        make_face()
    extrude(amount=-CUT_EXTRUDE12_DEPTH, mode=Mode.SUBTRACT)

    # Fillet2
    fillet2_edges = [part.edges().sort_by_distance(p)[0] for p in [
        (-14.15, 32, 12.5),
        (0.85, 32, 12.5),
    ]]
    fillet(fillet2_edges, radius=FILLET2_R)

    # Sketch22 → Cut-Extrude13 (cut)
    with BuildSketch(Plane.XY.offset(25).offset(CUT_EXTRUDE13_START)):
        with BuildLine():
            Line((0, -11), (21.15, -11))
            Line((21.15, -11), (21.15, 11))
            Line((21.15, 11), (0, 11))
            ThreePointArc((0, 11), (11, 0), (0, -11))
        make_face()
    extrude(amount=CUT_EXTRUDE13_DEPTH, mode=Mode.SUBTRACT)

    # Fillet3
    fillet3_edges = [part.edges().sort_by_distance(p)[0] for p in [
        (21.15, 11, 14.5),
        (21.15, -11, 14.5),
    ]]
    fillet(fillet3_edges, radius=FILLET3_R)

    # Sketch23 → Boss-Extrude6 (add)
    with BuildSketch(Plane.ZY.offset(21.15)):
        with Locations((12.5, -27.5)):
            Rectangle(SKETCH23_W, SKETCH23_H)
    extrude(amount=BOSS_EXTRUDE6_DEPTH)

    # Sketch24 → Boss-Extrude7 (add)
    with BuildSketch(Plane(origin=(0, 0, 0), x_dir=(-1, 0, 0), z_dir=(0, 0, -1))):
        Polygon((29.15, -19.5), (21.15, -11.5), (21.15, -19.5), align=None)
    extrude(amount=-BOSS_EXTRUDE7_DEPTH)

    # Sketch25 → Cut-Extrude14 (cut)
    with BuildSketch(Plane.XY.offset(25)):
        Polygon((-17.4, -33.390896534), (-14.55, -31.745448267), (-14.55, -28.454551733), (-17.4, -26.809103466), (-20.25, -28.454551733), (-20.25, -31.745448267), align=None)
        Polygon((11.45, -31.745448267), (11.45, -28.454551733), (8.6, -26.809103466), (5.75, -28.454551733), (5.75, -31.745448267), (8.6, -33.390896534), align=None)
    extrude(amount=-CUT_EXTRUDE14_DEPTH, mode=Mode.SUBTRACT)

    # Sketch27 → Cut-Extrude15 (cut)
    # profile 1 of 4: a face of its own
    with BuildSketch(Plane.ZY.offset(29.15).offset(CUT_EXTRUDE15_START)):
        Polygon((0, -33.35), (3.354551733, -33.35), (6.645448267, -33.35), (8.290896534, -30.5), (6.645448267, -27.65), (3.354551733, -27.65), (0, -27.65), align=None)
        with Locations((5, -30.5)):
            Circle(SKETCH27_R, mode=Mode.SUBTRACT)
    # profile 2 of 4: a face of its own
    with BuildSketch(Plane.ZY.offset(29.15).offset(CUT_EXTRUDE15_START)):
        with Locations((5, -30.5)):
            Circle(SKETCH27_R)
    # profile 3 of 4: a face of its own
    with BuildSketch(Plane.ZY.offset(29.15).offset(CUT_EXTRUDE15_START)):
        Polygon((25, -27.65), (21.645448267, -27.65), (18.354551733, -27.65), (16.709103466, -30.5), (18.354551733, -33.35), (21.645448267, -33.35), (25, -33.35), align=None)
        with Locations((20, -30.5)):
            Circle(SKETCH27_R, mode=Mode.SUBTRACT)
    # profile 4 of 4: a face of its own
    with BuildSketch(Plane.ZY.offset(29.15).offset(CUT_EXTRUDE15_START)):
        with Locations((20, -30.5)):
            Circle(SKETCH27_R)
    cut_extrude15 = extrude(amount=-CUT_EXTRUDE15_DEPTH, mode=Mode.SUBTRACT)

    # Sketch27<3> → Cut-Extrude18 (cut)
    with BuildSketch(Plane.ZY.offset(29.15)):
        with Locations((5, -30.5)):
            Circle(SKETCH27_3_R)
        with Locations((20, -30.5)):
            Circle(SKETCH27_3_R)
    cut_extrude18 = extrude(amount=-CUT_EXTRUDE18_DEPTH, mode=Mode.SUBTRACT)

    # Sketch29 → Boss-Extrude9 (add)
    with BuildSketch(Plane(origin=(0, 0, 9.5), x_dir=(-1, 0, 0), z_dir=(0, 0, -1))):
        with Locations((-16.75, -30.1)):
            Rectangle(SKETCH29_W, SKETCH29_H)
    extrude(amount=BOSS_EXTRUDE9_DEPTH)

    # Mirror2: Cut-Extrude15, Cut-Extrude18 across plane
    add(cut_extrude15.mirror(Plane.ZY.offset(4)), mode=Mode.SUBTRACT)
    add(cut_extrude18.mirror(Plane.ZY.offset(4)), mode=Mode.SUBTRACT)

    # Fillet4
    fillet4_edges = [part.edges().sort_by_distance(p)[0] for p in [
        (-4.4, 32, 13.7),
    ]]
    fillet(fillet4_edges, radius=FILLET4_R)


solid = part.part
